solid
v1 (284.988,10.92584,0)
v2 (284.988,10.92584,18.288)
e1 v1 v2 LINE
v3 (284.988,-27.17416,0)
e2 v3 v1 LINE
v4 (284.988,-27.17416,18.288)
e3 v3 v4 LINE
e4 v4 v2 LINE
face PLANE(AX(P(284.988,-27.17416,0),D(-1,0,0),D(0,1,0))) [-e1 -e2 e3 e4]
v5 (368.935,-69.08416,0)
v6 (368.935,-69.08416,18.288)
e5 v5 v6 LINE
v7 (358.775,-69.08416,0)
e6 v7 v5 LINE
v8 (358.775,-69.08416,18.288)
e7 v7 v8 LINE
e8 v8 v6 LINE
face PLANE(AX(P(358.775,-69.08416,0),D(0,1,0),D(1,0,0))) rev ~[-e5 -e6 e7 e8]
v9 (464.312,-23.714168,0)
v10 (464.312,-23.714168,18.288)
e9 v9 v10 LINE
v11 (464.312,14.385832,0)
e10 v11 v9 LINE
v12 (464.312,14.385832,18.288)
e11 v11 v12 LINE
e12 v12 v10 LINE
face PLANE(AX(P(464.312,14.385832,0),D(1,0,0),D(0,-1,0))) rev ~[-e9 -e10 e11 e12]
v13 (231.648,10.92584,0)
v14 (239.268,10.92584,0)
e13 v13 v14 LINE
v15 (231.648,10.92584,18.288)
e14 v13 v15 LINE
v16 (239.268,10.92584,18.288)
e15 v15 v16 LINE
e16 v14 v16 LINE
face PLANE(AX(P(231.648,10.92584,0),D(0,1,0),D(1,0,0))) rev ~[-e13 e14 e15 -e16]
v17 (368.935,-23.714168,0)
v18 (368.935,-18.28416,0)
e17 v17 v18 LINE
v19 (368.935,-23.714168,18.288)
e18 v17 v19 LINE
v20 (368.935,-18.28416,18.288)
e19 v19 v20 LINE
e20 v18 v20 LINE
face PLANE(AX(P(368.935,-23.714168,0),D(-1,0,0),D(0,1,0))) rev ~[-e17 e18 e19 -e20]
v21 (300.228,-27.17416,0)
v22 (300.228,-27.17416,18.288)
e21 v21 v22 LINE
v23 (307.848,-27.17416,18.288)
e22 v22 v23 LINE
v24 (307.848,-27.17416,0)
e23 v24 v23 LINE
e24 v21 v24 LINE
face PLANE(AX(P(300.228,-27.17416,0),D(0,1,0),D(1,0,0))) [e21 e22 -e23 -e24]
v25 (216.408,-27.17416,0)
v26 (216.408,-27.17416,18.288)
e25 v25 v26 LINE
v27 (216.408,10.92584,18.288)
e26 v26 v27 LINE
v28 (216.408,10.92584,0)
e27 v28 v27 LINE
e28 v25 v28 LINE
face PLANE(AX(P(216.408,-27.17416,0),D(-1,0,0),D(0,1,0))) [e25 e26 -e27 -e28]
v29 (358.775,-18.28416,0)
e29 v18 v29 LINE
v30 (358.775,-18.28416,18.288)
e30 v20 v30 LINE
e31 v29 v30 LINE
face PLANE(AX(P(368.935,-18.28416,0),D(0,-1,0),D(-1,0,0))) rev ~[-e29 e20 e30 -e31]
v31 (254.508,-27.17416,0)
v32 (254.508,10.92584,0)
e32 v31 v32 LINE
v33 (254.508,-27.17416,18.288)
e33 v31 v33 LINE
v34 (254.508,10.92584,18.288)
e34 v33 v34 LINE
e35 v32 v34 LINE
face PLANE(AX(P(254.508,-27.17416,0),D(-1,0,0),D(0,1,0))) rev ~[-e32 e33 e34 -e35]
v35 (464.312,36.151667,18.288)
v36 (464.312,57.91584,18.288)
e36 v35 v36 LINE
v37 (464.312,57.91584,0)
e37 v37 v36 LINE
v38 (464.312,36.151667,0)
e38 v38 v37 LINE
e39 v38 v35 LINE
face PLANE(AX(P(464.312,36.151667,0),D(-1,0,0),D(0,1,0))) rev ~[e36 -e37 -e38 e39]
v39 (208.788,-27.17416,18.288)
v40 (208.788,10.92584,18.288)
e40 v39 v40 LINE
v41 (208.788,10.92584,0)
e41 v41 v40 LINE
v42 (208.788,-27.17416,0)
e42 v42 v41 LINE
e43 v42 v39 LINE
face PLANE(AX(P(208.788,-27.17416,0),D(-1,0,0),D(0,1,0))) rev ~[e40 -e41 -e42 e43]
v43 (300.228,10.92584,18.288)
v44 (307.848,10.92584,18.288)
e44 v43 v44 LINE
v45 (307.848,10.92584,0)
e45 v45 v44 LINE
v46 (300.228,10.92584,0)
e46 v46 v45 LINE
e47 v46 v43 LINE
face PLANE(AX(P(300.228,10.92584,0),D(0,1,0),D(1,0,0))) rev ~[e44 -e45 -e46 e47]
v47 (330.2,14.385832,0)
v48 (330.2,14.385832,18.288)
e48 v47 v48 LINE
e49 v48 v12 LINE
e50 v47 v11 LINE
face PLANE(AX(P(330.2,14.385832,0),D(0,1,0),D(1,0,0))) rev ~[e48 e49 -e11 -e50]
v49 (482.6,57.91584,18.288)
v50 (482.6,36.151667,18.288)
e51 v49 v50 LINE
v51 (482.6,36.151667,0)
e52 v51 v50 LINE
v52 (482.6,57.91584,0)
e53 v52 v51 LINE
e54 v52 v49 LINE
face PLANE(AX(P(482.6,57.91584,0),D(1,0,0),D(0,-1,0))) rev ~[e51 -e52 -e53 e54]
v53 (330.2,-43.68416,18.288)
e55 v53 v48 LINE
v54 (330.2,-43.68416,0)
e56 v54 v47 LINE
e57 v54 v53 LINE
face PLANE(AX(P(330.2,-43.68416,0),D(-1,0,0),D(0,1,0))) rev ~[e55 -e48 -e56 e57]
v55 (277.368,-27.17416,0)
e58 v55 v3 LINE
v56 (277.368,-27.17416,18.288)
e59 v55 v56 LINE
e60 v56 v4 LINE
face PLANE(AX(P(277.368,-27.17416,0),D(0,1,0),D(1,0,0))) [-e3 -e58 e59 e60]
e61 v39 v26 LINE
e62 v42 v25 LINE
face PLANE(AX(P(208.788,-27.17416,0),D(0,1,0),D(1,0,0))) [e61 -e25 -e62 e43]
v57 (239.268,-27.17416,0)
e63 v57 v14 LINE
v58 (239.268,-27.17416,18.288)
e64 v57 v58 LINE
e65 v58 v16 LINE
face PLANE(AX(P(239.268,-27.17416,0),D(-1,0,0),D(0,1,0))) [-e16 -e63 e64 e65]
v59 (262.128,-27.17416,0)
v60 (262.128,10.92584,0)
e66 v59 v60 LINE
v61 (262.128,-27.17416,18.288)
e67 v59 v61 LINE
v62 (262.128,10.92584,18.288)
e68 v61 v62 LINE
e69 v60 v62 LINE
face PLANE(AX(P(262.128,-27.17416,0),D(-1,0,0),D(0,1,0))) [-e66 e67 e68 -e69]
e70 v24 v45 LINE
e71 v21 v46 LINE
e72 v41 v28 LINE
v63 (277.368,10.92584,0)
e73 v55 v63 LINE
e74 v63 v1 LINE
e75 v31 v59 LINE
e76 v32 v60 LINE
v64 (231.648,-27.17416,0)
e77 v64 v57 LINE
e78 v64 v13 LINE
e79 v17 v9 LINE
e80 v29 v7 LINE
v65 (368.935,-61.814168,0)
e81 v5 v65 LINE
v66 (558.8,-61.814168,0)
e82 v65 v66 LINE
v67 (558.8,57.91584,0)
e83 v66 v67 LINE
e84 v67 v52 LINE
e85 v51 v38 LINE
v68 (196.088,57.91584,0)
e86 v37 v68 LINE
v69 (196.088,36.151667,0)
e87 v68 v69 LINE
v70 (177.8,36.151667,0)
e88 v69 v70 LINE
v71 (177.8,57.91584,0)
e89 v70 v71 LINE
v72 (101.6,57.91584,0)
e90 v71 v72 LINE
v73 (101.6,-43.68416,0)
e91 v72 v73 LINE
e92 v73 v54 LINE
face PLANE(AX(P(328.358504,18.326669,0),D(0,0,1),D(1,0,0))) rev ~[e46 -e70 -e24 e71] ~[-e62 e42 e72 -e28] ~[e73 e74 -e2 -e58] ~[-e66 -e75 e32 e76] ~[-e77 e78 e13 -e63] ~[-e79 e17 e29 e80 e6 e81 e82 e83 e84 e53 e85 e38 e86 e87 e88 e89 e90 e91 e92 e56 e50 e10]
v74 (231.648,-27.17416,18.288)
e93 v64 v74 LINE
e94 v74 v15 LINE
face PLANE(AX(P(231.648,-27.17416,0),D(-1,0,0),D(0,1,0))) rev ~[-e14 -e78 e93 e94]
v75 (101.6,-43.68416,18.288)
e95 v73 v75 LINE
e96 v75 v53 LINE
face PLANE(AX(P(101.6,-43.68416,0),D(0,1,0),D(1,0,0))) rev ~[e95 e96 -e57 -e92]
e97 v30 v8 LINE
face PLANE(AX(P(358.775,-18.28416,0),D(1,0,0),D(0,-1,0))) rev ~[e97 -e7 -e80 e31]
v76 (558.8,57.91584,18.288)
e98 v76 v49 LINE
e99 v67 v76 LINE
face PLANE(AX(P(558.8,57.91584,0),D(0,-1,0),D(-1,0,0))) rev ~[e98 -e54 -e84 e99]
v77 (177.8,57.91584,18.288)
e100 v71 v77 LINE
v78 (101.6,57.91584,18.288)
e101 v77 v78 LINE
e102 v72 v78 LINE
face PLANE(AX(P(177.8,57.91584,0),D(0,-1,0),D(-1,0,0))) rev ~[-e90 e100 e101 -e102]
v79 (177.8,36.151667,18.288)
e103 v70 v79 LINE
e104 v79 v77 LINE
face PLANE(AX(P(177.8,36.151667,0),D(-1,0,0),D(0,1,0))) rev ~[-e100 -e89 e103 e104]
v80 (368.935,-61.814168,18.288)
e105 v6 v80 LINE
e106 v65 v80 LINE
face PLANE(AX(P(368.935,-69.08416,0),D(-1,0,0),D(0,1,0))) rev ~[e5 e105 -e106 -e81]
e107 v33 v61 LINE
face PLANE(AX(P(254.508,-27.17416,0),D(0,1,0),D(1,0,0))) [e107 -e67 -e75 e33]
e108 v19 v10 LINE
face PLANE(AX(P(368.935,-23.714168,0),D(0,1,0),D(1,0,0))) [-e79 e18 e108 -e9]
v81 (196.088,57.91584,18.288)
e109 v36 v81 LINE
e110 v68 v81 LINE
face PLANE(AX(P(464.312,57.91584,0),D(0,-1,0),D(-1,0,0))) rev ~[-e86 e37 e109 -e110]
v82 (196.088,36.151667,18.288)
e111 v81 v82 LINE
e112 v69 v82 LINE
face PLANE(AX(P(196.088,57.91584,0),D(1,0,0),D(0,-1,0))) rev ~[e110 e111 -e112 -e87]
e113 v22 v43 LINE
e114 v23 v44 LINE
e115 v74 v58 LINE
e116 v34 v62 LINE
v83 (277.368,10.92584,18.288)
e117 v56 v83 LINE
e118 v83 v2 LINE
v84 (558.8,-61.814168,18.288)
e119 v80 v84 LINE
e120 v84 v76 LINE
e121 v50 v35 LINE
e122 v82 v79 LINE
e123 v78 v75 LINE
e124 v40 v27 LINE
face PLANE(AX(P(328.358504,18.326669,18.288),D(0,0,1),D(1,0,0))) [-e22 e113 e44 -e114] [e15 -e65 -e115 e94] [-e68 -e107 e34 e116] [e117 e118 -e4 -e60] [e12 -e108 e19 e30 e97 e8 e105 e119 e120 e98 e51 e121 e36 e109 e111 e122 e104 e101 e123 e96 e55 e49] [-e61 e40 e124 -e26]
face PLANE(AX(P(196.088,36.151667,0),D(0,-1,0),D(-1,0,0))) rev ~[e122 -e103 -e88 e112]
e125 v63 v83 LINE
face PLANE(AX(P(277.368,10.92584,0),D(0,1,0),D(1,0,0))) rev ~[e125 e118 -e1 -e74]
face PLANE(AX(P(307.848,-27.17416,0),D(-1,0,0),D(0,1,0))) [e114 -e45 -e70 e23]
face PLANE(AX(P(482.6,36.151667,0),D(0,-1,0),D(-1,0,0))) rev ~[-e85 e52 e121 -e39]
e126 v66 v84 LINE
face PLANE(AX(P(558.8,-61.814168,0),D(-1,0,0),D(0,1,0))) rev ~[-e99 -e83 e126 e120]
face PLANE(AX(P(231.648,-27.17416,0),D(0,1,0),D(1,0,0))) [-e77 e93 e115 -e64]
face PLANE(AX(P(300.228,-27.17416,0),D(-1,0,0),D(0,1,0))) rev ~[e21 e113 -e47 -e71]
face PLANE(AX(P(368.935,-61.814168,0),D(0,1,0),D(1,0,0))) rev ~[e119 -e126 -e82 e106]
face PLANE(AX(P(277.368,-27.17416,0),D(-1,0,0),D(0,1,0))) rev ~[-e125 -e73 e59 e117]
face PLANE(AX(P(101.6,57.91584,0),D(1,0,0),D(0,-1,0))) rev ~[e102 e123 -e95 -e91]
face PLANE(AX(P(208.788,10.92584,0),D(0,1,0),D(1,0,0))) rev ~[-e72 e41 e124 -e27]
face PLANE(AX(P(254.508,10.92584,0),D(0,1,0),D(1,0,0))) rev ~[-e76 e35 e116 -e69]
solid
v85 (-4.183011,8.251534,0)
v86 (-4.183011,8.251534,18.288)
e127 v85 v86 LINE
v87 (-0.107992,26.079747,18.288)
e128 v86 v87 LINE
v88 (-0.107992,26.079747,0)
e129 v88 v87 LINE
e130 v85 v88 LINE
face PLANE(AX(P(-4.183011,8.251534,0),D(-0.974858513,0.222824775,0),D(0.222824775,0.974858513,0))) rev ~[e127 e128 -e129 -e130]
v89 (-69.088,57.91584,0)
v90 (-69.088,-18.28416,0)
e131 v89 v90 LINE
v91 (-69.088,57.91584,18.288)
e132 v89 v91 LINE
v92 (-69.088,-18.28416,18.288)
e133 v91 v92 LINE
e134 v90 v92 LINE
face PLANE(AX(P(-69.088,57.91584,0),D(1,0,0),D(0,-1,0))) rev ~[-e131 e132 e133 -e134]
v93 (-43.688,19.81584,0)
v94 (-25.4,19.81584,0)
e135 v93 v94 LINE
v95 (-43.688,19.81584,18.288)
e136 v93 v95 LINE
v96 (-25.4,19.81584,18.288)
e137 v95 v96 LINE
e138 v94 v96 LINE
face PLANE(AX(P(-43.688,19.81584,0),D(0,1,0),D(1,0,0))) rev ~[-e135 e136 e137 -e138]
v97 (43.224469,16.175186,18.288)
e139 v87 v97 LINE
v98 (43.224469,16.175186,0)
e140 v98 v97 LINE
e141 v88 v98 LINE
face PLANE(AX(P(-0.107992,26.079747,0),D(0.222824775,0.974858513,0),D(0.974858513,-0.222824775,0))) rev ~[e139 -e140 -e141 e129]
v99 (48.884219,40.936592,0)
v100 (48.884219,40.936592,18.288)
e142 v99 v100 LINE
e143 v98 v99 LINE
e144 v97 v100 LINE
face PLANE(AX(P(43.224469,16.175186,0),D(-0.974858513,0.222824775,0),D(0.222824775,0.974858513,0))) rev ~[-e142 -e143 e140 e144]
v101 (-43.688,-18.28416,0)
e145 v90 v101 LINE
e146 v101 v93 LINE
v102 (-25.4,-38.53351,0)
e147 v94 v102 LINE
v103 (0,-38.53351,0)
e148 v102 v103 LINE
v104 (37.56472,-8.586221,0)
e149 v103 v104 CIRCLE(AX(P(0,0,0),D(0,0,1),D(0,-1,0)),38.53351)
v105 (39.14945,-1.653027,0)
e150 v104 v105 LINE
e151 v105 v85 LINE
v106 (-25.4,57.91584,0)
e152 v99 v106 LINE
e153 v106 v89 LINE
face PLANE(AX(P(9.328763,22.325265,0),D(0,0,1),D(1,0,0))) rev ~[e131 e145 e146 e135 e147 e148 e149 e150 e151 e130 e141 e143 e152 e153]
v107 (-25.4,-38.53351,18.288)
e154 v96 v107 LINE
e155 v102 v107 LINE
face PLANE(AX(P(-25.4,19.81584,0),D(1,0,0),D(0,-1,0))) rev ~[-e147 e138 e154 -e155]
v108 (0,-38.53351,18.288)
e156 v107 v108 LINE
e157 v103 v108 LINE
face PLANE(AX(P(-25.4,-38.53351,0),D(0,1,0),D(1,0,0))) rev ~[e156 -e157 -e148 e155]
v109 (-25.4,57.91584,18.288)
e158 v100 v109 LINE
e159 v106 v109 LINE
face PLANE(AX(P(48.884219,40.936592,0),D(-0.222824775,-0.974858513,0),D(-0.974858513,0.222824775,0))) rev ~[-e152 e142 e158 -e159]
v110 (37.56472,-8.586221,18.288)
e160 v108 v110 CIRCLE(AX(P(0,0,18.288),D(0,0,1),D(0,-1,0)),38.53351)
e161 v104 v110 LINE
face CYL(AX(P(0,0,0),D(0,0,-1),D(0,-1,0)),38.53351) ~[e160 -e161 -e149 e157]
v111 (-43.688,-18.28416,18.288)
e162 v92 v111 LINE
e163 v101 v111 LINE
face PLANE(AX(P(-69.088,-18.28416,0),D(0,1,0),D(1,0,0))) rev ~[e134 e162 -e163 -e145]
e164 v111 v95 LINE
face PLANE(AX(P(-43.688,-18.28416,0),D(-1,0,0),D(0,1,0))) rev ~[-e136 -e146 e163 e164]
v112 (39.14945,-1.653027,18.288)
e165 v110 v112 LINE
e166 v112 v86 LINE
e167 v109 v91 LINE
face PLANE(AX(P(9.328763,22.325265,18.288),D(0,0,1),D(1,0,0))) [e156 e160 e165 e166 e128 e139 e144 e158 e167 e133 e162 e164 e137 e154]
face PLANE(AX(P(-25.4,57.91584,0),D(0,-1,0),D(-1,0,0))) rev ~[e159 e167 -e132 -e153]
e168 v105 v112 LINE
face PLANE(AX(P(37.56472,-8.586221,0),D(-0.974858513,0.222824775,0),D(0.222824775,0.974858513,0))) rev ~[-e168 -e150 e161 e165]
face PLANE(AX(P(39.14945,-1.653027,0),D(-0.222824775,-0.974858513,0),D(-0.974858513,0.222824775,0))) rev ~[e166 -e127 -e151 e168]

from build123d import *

# Parameters (mm, degrees)
F1_W     = 25.4
F1_H     = 38.1
F2_DEPTH = 18.288
F1_W_2   = 7.62
F1_W_3   = 95.377
F1_H_2   = 18.1300078465
F1_H_3   = 19.9699921535
F1_W_4   = 76.2


# Not quite as in the source:
# - a variable given as a bare number and used for a length is read in inches; the dataset says mm whatever the document's units were


with BuildPart() as f2:
    # F1 (on Top) → F2 (new body)
    with BuildSketch(Plane.XY):
        Polygon((-25.4, 57.9158396344), (-25.4, 19.8158396344), (-25.4, 5.8057135582), (0, 0), (37.5647200947, -8.58622066), (39.1494498942, -1.6530269181), (-4.1830109925, 8.2515343291), (-0.1079915079, 26.0797468083), (43.2244693788, 16.175185561), (48.884218663, 40.936591782), align=None)
        with BuildLine():
            Line((37.5647200947, -8.58622066), (0, 0))
            Line((0, 0), (0, -38.5335098455))
            ThreePointArc((0, -38.5335098455), (24.020555392, -30.1304546875), (37.5647200947, -8.58622066))
        make_face()
        Polygon((-69.088, 19.8158396344), (-43.688, 19.8158396344), (-25.4, 19.8158396344), (-25.4, 57.9158396344), (-69.088, 57.9158396344), align=None)
        with Locations((-56.388, 0.7658396344)):
            Rectangle(F1_W, F1_H)
        Polygon((0, 0), (-25.4, 5.8057135582), (-25.4, -38.5335098455), (0, -38.5335098455), align=None)
    extrude(amount=F2_DEPTH)


with BuildPart() as f2b:
    # F1 (on Top) → F2, piece 2 (new body)
    with BuildSketch(Plane.XY):
        Polygon((177.8, 57.9158396344), (101.6, 57.9158396344), (101.6, -43.6841603656), (330.2, -43.6841603656), (330.2, 14.3858317879), (368.935, 14.3858317879), (464.312, 14.3858317879), (464.312, -23.7141682121), (482.6, -23.7141682121), (482.6, 14.3858317879), (558.8, 14.3858317879), (558.8, 57.9158396344), (482.6, 57.9158396344), (482.6, 36.1516669545), (464.312, 36.1516669545), (464.312, 57.9158396344), (196.088, 57.9158396344), (196.088, 36.1516669545), (177.8, 36.1516669545), align=None)
        with Locations((212.598, -8.1241603656)):
            Rectangle(F1_W_2, F1_H, mode=Mode.SUBTRACT)
        with Locations((235.458, -8.1241603656)):
            Rectangle(F1_W_2, F1_H, mode=Mode.SUBTRACT)
        with Locations((258.318, -8.1241603656)):
            Rectangle(F1_W_2, F1_H, mode=Mode.SUBTRACT)
        with Locations((281.178, -8.1241603656)):
            Rectangle(F1_W_2, F1_H, mode=Mode.SUBTRACT)
        with Locations((304.038, -8.1241603656)):
            Rectangle(F1_W_2, F1_H, mode=Mode.SUBTRACT)
        Polygon((358.775, -18.2841603656), (358.775, -43.6841603656), (368.935, -43.6841603656), (368.935, -23.7141682121), (368.935, -18.2841603656), align=None)
        Polygon((368.935, -43.6841603656), (358.775, -43.6841603656), (358.775, -69.0841603656), (368.935, -69.0841603656), (368.935, -61.8141682121), align=None)
        with Locations((416.6235, -52.7491642889)):
            Rectangle(F1_W_3, F1_H_2)
        with Locations((416.6235, -33.6991642889)):
            Rectangle(F1_W_3, F1_H_3)
        Polygon((464.312, -23.7141682121), (464.312, -43.6841603656), (464.312, -61.8141682121), (558.8, -61.8141682121), (558.8, -43.6841603656), (558.8, -23.7141682121), (482.6, -23.7141682121), align=None)
        with Locations((520.7, -4.6641682121)):
            Rectangle(F1_W_4, F1_H)
    extrude(amount=F2_DEPTH)


solid = Compound([f2.part, f2b.part])
